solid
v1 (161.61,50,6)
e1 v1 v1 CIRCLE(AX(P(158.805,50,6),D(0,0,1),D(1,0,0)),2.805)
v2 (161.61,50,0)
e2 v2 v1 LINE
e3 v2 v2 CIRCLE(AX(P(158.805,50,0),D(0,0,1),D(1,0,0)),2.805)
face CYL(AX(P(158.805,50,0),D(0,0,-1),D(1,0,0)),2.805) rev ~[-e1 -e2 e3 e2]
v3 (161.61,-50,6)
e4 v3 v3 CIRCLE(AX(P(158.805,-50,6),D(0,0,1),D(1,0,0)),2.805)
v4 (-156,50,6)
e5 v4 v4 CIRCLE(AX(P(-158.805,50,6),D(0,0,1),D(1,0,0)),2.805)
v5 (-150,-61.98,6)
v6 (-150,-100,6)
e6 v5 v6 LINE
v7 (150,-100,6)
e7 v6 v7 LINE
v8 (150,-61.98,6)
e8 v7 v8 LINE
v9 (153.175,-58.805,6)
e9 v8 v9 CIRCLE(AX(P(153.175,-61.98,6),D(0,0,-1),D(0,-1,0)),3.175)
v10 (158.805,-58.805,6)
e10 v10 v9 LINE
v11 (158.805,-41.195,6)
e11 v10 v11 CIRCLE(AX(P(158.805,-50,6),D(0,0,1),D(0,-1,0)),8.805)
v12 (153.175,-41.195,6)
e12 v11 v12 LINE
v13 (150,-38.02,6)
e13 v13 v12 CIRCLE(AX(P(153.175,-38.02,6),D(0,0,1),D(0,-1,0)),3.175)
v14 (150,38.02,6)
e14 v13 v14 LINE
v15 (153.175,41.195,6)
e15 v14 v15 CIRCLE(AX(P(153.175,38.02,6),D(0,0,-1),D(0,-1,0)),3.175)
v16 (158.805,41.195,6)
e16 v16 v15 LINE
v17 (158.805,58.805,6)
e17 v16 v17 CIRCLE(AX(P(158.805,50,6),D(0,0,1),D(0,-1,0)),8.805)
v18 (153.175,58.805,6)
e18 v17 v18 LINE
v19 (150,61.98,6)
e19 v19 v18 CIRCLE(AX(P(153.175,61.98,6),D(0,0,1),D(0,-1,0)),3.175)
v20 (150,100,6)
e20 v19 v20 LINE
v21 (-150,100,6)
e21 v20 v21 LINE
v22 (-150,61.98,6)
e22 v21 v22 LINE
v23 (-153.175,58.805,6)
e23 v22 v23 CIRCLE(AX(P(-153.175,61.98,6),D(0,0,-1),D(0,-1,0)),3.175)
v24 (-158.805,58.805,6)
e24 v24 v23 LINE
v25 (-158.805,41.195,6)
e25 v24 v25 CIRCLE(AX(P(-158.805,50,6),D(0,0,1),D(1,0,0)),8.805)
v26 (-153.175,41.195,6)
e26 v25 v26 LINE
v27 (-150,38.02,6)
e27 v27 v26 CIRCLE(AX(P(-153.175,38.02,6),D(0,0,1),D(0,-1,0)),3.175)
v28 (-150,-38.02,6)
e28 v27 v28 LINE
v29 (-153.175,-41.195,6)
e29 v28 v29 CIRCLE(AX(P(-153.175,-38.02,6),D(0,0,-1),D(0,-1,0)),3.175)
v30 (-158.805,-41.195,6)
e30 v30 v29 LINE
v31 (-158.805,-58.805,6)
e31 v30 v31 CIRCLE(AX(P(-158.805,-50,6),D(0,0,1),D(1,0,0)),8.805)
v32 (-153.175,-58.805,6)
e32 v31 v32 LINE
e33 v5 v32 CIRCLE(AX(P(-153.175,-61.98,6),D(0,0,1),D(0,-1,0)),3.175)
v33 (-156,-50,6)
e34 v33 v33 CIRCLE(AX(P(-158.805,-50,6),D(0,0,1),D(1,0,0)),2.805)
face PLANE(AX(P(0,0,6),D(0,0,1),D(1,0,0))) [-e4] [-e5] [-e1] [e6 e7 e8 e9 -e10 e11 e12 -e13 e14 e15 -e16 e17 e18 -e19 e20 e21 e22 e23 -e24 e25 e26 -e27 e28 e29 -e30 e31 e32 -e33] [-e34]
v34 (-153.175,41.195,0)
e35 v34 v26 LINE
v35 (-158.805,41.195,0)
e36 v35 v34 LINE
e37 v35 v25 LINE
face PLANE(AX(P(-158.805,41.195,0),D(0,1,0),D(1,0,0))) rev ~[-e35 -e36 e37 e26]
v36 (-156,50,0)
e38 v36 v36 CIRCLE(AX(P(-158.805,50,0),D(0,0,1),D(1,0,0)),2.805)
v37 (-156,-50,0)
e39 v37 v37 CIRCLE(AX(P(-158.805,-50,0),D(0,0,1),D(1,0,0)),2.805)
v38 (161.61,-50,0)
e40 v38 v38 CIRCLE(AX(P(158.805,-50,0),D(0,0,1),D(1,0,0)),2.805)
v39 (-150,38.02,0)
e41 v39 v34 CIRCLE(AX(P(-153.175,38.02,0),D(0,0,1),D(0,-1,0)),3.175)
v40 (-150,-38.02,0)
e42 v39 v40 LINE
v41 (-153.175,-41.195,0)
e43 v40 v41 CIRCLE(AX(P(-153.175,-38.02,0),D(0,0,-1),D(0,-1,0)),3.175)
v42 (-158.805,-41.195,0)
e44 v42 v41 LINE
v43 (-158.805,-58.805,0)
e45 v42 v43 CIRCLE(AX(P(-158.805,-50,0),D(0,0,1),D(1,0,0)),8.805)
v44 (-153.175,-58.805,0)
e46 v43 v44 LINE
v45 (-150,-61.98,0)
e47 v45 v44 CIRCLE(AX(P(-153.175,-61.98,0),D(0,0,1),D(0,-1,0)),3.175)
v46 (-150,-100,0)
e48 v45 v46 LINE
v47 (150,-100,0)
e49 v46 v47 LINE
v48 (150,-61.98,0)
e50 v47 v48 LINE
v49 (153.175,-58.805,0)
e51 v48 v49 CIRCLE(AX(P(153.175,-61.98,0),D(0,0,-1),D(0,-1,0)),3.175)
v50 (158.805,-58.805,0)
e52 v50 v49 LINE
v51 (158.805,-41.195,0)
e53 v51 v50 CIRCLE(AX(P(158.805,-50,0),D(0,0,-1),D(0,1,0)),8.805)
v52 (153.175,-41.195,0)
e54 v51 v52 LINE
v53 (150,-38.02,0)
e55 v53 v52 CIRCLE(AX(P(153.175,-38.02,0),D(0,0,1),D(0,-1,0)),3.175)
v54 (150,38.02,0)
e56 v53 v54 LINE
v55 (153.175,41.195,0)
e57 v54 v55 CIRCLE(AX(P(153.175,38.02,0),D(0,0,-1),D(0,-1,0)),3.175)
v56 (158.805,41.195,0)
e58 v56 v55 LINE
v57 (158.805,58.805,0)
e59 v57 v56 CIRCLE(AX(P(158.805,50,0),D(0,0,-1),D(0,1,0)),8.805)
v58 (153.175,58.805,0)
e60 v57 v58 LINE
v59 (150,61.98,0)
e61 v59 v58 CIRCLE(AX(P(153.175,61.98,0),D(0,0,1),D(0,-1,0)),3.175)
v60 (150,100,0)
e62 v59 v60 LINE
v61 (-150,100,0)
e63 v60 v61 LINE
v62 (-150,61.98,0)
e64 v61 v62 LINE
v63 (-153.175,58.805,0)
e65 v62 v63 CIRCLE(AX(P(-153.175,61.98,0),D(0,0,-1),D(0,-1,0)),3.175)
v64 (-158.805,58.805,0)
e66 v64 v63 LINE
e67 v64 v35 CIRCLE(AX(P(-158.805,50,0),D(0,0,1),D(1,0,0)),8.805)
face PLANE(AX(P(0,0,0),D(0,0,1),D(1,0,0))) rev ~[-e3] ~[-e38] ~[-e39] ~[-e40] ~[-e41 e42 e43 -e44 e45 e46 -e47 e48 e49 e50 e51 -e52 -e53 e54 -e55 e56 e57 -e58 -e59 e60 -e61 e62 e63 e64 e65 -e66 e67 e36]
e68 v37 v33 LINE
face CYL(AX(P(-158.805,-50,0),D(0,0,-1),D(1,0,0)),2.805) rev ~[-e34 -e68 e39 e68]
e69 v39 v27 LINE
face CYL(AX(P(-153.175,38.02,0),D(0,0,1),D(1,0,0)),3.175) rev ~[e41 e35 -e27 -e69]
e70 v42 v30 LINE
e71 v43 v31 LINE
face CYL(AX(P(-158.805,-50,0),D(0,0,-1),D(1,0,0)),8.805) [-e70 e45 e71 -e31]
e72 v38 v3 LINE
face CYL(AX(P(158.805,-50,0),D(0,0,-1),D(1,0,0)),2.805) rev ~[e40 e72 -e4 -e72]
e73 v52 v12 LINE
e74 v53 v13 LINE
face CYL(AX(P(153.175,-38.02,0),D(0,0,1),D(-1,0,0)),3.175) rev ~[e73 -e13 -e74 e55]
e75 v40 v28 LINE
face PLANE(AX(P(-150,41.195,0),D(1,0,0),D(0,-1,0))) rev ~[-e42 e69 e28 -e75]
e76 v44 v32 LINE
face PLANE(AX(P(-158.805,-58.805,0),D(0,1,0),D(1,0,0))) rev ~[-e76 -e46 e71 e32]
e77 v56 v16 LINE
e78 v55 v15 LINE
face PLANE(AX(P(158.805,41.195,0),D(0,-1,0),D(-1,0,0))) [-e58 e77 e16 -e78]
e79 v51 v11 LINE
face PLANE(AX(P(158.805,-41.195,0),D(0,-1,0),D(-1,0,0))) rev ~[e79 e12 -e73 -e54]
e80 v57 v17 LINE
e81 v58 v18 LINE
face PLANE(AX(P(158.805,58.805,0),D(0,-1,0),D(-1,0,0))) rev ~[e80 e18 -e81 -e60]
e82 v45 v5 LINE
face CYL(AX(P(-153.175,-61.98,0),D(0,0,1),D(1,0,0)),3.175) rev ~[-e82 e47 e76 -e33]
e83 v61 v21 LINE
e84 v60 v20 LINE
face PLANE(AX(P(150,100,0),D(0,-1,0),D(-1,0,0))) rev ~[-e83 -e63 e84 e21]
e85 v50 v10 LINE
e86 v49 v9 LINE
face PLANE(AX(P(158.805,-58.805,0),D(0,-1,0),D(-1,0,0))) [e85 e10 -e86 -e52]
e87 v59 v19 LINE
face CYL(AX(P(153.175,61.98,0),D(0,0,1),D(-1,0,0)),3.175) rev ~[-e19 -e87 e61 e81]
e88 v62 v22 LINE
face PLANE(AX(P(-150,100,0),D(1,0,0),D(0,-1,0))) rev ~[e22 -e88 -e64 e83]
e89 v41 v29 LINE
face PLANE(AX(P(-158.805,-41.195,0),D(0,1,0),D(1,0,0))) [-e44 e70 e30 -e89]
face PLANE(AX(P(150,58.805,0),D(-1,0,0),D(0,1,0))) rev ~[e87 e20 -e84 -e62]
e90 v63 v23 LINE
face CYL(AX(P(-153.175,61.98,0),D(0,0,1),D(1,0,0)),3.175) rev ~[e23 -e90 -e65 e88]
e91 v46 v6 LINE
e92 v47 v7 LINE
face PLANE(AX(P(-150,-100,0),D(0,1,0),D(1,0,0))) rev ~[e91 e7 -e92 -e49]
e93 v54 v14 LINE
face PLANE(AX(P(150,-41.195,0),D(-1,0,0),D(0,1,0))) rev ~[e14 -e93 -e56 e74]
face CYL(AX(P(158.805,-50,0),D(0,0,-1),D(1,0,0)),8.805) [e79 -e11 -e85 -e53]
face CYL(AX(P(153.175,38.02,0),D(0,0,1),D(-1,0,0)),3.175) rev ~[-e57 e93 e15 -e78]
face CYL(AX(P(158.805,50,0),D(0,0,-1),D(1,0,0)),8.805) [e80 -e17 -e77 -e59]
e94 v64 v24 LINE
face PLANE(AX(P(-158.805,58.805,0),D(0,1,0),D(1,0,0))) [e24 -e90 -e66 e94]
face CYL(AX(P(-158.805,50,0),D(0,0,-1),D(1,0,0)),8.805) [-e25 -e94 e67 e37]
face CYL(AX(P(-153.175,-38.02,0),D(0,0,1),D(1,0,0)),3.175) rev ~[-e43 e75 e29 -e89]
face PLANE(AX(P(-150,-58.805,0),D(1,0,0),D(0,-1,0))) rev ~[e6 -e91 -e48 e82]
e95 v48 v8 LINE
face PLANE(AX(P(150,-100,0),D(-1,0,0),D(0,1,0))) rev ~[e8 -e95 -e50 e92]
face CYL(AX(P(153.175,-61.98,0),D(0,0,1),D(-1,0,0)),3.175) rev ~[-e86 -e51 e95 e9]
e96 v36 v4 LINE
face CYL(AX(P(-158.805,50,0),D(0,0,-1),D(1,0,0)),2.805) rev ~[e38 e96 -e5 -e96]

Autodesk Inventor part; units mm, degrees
ref_plane "YZ Plane" through (0, 0, 0) normal (1, 0, 0) x (0, 1, 0)
ref_plane "XZ Plane" through (0, 0, 0) normal (0, 1, 0) x (-1, 0, 0)
ref_plane "XY Plane" through (0, 0, 0) normal (0, 0, 1) x (1, 0, 0)
sketch "Sketch1" plane through (0, 0, 0) normal (0, 0, 1) x (1, 0, 0)
  line L0 (150, -100) -> (150, 100)
  line L1 (-150, -100) -> (150, -100)
  line L2 (150, 100) -> (-150, 100)
  line L3 (-150, 100) -> (-150, -100)
  line L4 (0, 100) -> (0, 0) construction
  line L5 (0, 0) -> (0, -100) construction
  line L6 (0, -50) -> (150, -50) construction
  line L7 (0, 50) -> (150, 50) construction
  line L8 (0, 50) -> (-150, 50) construction
  line L9 (0, -50) -> (-150, -50) construction
  line L10 (-150, -50) -> (-158.805, -50) construction
  circle A0 centre (-158.805, -50) radius 8.805
  circle A1 centre (-158.805, -50) radius 2.805
  circle A2 centre (-158.805, 50) radius 2.805
  circle A3 centre (-158.805, 50) radius 8.805
  line L11 (150, -50) -> (158.805, -50) construction
  circle A4 centre (158.805, -50) radius 8.805
  circle A5 centre (158.805, -50) radius 2.805
  circle A6 centre (158.805, 50) radius 8.805
  circle A7 centre (158.805, 50) radius 2.805
  line L12 (158.805, 41.195) -> (150, 41.195)
  line L13 (158.805, 58.805) -> (150, 58.805)
  line L14 (158.805, -41.195) -> (150, -41.195)
  line L15 (158.805, -58.805) -> (150, -58.805)
  line L16 (-158.805, -58.805) -> (-150, -58.805)
  line L17 (-158.805, -41.195) -> (-150, -41.195)
  line L18 (-158.805, 41.195) -> (-150, 41.195)
  line L19 (-158.805, 58.805) -> (-150, 58.805)
  dimension "d0" = 8.805
  dimension "d1" = 5.61
  dimension "d2" = 5.61
  dimension "d3" = 8.805
  dimension "d4" = 5.61
extrude "Plate1" add sketch "Sketch1" along normal blind 6
fillet "Corner Round1" radius 3.175 8 edges at (-150, -58.805, 3) (-150, -41.195, 3) (-150, 41.195, 3) (-150, 58.805, 3) (150, 58.805, 3) (150, 41.195, 3) (150, -41.195, 3) (150, -58.805, 3)
equation "\"d7\" = Thickness"
equation "\"BendRadius\" = Thickness"
equation "\"BendReliefWidth\" = Thickness"
equation "\"BendReliefDepth\" = 0.5 * Thickness"
equation "\"CornerReliefSize\" = 4 * Thickness"
equation "\"MinimumRemnant\" = 2 * Thickness"
equation "\"TransitionRadius\" = BendRadius"
equation "\"JacobiRadiusSize\" = BendRadius"
equation "\"GapSize\" = Thickness"
equation "\"Thickness\" = 6"
properties part number "bed-plate"
